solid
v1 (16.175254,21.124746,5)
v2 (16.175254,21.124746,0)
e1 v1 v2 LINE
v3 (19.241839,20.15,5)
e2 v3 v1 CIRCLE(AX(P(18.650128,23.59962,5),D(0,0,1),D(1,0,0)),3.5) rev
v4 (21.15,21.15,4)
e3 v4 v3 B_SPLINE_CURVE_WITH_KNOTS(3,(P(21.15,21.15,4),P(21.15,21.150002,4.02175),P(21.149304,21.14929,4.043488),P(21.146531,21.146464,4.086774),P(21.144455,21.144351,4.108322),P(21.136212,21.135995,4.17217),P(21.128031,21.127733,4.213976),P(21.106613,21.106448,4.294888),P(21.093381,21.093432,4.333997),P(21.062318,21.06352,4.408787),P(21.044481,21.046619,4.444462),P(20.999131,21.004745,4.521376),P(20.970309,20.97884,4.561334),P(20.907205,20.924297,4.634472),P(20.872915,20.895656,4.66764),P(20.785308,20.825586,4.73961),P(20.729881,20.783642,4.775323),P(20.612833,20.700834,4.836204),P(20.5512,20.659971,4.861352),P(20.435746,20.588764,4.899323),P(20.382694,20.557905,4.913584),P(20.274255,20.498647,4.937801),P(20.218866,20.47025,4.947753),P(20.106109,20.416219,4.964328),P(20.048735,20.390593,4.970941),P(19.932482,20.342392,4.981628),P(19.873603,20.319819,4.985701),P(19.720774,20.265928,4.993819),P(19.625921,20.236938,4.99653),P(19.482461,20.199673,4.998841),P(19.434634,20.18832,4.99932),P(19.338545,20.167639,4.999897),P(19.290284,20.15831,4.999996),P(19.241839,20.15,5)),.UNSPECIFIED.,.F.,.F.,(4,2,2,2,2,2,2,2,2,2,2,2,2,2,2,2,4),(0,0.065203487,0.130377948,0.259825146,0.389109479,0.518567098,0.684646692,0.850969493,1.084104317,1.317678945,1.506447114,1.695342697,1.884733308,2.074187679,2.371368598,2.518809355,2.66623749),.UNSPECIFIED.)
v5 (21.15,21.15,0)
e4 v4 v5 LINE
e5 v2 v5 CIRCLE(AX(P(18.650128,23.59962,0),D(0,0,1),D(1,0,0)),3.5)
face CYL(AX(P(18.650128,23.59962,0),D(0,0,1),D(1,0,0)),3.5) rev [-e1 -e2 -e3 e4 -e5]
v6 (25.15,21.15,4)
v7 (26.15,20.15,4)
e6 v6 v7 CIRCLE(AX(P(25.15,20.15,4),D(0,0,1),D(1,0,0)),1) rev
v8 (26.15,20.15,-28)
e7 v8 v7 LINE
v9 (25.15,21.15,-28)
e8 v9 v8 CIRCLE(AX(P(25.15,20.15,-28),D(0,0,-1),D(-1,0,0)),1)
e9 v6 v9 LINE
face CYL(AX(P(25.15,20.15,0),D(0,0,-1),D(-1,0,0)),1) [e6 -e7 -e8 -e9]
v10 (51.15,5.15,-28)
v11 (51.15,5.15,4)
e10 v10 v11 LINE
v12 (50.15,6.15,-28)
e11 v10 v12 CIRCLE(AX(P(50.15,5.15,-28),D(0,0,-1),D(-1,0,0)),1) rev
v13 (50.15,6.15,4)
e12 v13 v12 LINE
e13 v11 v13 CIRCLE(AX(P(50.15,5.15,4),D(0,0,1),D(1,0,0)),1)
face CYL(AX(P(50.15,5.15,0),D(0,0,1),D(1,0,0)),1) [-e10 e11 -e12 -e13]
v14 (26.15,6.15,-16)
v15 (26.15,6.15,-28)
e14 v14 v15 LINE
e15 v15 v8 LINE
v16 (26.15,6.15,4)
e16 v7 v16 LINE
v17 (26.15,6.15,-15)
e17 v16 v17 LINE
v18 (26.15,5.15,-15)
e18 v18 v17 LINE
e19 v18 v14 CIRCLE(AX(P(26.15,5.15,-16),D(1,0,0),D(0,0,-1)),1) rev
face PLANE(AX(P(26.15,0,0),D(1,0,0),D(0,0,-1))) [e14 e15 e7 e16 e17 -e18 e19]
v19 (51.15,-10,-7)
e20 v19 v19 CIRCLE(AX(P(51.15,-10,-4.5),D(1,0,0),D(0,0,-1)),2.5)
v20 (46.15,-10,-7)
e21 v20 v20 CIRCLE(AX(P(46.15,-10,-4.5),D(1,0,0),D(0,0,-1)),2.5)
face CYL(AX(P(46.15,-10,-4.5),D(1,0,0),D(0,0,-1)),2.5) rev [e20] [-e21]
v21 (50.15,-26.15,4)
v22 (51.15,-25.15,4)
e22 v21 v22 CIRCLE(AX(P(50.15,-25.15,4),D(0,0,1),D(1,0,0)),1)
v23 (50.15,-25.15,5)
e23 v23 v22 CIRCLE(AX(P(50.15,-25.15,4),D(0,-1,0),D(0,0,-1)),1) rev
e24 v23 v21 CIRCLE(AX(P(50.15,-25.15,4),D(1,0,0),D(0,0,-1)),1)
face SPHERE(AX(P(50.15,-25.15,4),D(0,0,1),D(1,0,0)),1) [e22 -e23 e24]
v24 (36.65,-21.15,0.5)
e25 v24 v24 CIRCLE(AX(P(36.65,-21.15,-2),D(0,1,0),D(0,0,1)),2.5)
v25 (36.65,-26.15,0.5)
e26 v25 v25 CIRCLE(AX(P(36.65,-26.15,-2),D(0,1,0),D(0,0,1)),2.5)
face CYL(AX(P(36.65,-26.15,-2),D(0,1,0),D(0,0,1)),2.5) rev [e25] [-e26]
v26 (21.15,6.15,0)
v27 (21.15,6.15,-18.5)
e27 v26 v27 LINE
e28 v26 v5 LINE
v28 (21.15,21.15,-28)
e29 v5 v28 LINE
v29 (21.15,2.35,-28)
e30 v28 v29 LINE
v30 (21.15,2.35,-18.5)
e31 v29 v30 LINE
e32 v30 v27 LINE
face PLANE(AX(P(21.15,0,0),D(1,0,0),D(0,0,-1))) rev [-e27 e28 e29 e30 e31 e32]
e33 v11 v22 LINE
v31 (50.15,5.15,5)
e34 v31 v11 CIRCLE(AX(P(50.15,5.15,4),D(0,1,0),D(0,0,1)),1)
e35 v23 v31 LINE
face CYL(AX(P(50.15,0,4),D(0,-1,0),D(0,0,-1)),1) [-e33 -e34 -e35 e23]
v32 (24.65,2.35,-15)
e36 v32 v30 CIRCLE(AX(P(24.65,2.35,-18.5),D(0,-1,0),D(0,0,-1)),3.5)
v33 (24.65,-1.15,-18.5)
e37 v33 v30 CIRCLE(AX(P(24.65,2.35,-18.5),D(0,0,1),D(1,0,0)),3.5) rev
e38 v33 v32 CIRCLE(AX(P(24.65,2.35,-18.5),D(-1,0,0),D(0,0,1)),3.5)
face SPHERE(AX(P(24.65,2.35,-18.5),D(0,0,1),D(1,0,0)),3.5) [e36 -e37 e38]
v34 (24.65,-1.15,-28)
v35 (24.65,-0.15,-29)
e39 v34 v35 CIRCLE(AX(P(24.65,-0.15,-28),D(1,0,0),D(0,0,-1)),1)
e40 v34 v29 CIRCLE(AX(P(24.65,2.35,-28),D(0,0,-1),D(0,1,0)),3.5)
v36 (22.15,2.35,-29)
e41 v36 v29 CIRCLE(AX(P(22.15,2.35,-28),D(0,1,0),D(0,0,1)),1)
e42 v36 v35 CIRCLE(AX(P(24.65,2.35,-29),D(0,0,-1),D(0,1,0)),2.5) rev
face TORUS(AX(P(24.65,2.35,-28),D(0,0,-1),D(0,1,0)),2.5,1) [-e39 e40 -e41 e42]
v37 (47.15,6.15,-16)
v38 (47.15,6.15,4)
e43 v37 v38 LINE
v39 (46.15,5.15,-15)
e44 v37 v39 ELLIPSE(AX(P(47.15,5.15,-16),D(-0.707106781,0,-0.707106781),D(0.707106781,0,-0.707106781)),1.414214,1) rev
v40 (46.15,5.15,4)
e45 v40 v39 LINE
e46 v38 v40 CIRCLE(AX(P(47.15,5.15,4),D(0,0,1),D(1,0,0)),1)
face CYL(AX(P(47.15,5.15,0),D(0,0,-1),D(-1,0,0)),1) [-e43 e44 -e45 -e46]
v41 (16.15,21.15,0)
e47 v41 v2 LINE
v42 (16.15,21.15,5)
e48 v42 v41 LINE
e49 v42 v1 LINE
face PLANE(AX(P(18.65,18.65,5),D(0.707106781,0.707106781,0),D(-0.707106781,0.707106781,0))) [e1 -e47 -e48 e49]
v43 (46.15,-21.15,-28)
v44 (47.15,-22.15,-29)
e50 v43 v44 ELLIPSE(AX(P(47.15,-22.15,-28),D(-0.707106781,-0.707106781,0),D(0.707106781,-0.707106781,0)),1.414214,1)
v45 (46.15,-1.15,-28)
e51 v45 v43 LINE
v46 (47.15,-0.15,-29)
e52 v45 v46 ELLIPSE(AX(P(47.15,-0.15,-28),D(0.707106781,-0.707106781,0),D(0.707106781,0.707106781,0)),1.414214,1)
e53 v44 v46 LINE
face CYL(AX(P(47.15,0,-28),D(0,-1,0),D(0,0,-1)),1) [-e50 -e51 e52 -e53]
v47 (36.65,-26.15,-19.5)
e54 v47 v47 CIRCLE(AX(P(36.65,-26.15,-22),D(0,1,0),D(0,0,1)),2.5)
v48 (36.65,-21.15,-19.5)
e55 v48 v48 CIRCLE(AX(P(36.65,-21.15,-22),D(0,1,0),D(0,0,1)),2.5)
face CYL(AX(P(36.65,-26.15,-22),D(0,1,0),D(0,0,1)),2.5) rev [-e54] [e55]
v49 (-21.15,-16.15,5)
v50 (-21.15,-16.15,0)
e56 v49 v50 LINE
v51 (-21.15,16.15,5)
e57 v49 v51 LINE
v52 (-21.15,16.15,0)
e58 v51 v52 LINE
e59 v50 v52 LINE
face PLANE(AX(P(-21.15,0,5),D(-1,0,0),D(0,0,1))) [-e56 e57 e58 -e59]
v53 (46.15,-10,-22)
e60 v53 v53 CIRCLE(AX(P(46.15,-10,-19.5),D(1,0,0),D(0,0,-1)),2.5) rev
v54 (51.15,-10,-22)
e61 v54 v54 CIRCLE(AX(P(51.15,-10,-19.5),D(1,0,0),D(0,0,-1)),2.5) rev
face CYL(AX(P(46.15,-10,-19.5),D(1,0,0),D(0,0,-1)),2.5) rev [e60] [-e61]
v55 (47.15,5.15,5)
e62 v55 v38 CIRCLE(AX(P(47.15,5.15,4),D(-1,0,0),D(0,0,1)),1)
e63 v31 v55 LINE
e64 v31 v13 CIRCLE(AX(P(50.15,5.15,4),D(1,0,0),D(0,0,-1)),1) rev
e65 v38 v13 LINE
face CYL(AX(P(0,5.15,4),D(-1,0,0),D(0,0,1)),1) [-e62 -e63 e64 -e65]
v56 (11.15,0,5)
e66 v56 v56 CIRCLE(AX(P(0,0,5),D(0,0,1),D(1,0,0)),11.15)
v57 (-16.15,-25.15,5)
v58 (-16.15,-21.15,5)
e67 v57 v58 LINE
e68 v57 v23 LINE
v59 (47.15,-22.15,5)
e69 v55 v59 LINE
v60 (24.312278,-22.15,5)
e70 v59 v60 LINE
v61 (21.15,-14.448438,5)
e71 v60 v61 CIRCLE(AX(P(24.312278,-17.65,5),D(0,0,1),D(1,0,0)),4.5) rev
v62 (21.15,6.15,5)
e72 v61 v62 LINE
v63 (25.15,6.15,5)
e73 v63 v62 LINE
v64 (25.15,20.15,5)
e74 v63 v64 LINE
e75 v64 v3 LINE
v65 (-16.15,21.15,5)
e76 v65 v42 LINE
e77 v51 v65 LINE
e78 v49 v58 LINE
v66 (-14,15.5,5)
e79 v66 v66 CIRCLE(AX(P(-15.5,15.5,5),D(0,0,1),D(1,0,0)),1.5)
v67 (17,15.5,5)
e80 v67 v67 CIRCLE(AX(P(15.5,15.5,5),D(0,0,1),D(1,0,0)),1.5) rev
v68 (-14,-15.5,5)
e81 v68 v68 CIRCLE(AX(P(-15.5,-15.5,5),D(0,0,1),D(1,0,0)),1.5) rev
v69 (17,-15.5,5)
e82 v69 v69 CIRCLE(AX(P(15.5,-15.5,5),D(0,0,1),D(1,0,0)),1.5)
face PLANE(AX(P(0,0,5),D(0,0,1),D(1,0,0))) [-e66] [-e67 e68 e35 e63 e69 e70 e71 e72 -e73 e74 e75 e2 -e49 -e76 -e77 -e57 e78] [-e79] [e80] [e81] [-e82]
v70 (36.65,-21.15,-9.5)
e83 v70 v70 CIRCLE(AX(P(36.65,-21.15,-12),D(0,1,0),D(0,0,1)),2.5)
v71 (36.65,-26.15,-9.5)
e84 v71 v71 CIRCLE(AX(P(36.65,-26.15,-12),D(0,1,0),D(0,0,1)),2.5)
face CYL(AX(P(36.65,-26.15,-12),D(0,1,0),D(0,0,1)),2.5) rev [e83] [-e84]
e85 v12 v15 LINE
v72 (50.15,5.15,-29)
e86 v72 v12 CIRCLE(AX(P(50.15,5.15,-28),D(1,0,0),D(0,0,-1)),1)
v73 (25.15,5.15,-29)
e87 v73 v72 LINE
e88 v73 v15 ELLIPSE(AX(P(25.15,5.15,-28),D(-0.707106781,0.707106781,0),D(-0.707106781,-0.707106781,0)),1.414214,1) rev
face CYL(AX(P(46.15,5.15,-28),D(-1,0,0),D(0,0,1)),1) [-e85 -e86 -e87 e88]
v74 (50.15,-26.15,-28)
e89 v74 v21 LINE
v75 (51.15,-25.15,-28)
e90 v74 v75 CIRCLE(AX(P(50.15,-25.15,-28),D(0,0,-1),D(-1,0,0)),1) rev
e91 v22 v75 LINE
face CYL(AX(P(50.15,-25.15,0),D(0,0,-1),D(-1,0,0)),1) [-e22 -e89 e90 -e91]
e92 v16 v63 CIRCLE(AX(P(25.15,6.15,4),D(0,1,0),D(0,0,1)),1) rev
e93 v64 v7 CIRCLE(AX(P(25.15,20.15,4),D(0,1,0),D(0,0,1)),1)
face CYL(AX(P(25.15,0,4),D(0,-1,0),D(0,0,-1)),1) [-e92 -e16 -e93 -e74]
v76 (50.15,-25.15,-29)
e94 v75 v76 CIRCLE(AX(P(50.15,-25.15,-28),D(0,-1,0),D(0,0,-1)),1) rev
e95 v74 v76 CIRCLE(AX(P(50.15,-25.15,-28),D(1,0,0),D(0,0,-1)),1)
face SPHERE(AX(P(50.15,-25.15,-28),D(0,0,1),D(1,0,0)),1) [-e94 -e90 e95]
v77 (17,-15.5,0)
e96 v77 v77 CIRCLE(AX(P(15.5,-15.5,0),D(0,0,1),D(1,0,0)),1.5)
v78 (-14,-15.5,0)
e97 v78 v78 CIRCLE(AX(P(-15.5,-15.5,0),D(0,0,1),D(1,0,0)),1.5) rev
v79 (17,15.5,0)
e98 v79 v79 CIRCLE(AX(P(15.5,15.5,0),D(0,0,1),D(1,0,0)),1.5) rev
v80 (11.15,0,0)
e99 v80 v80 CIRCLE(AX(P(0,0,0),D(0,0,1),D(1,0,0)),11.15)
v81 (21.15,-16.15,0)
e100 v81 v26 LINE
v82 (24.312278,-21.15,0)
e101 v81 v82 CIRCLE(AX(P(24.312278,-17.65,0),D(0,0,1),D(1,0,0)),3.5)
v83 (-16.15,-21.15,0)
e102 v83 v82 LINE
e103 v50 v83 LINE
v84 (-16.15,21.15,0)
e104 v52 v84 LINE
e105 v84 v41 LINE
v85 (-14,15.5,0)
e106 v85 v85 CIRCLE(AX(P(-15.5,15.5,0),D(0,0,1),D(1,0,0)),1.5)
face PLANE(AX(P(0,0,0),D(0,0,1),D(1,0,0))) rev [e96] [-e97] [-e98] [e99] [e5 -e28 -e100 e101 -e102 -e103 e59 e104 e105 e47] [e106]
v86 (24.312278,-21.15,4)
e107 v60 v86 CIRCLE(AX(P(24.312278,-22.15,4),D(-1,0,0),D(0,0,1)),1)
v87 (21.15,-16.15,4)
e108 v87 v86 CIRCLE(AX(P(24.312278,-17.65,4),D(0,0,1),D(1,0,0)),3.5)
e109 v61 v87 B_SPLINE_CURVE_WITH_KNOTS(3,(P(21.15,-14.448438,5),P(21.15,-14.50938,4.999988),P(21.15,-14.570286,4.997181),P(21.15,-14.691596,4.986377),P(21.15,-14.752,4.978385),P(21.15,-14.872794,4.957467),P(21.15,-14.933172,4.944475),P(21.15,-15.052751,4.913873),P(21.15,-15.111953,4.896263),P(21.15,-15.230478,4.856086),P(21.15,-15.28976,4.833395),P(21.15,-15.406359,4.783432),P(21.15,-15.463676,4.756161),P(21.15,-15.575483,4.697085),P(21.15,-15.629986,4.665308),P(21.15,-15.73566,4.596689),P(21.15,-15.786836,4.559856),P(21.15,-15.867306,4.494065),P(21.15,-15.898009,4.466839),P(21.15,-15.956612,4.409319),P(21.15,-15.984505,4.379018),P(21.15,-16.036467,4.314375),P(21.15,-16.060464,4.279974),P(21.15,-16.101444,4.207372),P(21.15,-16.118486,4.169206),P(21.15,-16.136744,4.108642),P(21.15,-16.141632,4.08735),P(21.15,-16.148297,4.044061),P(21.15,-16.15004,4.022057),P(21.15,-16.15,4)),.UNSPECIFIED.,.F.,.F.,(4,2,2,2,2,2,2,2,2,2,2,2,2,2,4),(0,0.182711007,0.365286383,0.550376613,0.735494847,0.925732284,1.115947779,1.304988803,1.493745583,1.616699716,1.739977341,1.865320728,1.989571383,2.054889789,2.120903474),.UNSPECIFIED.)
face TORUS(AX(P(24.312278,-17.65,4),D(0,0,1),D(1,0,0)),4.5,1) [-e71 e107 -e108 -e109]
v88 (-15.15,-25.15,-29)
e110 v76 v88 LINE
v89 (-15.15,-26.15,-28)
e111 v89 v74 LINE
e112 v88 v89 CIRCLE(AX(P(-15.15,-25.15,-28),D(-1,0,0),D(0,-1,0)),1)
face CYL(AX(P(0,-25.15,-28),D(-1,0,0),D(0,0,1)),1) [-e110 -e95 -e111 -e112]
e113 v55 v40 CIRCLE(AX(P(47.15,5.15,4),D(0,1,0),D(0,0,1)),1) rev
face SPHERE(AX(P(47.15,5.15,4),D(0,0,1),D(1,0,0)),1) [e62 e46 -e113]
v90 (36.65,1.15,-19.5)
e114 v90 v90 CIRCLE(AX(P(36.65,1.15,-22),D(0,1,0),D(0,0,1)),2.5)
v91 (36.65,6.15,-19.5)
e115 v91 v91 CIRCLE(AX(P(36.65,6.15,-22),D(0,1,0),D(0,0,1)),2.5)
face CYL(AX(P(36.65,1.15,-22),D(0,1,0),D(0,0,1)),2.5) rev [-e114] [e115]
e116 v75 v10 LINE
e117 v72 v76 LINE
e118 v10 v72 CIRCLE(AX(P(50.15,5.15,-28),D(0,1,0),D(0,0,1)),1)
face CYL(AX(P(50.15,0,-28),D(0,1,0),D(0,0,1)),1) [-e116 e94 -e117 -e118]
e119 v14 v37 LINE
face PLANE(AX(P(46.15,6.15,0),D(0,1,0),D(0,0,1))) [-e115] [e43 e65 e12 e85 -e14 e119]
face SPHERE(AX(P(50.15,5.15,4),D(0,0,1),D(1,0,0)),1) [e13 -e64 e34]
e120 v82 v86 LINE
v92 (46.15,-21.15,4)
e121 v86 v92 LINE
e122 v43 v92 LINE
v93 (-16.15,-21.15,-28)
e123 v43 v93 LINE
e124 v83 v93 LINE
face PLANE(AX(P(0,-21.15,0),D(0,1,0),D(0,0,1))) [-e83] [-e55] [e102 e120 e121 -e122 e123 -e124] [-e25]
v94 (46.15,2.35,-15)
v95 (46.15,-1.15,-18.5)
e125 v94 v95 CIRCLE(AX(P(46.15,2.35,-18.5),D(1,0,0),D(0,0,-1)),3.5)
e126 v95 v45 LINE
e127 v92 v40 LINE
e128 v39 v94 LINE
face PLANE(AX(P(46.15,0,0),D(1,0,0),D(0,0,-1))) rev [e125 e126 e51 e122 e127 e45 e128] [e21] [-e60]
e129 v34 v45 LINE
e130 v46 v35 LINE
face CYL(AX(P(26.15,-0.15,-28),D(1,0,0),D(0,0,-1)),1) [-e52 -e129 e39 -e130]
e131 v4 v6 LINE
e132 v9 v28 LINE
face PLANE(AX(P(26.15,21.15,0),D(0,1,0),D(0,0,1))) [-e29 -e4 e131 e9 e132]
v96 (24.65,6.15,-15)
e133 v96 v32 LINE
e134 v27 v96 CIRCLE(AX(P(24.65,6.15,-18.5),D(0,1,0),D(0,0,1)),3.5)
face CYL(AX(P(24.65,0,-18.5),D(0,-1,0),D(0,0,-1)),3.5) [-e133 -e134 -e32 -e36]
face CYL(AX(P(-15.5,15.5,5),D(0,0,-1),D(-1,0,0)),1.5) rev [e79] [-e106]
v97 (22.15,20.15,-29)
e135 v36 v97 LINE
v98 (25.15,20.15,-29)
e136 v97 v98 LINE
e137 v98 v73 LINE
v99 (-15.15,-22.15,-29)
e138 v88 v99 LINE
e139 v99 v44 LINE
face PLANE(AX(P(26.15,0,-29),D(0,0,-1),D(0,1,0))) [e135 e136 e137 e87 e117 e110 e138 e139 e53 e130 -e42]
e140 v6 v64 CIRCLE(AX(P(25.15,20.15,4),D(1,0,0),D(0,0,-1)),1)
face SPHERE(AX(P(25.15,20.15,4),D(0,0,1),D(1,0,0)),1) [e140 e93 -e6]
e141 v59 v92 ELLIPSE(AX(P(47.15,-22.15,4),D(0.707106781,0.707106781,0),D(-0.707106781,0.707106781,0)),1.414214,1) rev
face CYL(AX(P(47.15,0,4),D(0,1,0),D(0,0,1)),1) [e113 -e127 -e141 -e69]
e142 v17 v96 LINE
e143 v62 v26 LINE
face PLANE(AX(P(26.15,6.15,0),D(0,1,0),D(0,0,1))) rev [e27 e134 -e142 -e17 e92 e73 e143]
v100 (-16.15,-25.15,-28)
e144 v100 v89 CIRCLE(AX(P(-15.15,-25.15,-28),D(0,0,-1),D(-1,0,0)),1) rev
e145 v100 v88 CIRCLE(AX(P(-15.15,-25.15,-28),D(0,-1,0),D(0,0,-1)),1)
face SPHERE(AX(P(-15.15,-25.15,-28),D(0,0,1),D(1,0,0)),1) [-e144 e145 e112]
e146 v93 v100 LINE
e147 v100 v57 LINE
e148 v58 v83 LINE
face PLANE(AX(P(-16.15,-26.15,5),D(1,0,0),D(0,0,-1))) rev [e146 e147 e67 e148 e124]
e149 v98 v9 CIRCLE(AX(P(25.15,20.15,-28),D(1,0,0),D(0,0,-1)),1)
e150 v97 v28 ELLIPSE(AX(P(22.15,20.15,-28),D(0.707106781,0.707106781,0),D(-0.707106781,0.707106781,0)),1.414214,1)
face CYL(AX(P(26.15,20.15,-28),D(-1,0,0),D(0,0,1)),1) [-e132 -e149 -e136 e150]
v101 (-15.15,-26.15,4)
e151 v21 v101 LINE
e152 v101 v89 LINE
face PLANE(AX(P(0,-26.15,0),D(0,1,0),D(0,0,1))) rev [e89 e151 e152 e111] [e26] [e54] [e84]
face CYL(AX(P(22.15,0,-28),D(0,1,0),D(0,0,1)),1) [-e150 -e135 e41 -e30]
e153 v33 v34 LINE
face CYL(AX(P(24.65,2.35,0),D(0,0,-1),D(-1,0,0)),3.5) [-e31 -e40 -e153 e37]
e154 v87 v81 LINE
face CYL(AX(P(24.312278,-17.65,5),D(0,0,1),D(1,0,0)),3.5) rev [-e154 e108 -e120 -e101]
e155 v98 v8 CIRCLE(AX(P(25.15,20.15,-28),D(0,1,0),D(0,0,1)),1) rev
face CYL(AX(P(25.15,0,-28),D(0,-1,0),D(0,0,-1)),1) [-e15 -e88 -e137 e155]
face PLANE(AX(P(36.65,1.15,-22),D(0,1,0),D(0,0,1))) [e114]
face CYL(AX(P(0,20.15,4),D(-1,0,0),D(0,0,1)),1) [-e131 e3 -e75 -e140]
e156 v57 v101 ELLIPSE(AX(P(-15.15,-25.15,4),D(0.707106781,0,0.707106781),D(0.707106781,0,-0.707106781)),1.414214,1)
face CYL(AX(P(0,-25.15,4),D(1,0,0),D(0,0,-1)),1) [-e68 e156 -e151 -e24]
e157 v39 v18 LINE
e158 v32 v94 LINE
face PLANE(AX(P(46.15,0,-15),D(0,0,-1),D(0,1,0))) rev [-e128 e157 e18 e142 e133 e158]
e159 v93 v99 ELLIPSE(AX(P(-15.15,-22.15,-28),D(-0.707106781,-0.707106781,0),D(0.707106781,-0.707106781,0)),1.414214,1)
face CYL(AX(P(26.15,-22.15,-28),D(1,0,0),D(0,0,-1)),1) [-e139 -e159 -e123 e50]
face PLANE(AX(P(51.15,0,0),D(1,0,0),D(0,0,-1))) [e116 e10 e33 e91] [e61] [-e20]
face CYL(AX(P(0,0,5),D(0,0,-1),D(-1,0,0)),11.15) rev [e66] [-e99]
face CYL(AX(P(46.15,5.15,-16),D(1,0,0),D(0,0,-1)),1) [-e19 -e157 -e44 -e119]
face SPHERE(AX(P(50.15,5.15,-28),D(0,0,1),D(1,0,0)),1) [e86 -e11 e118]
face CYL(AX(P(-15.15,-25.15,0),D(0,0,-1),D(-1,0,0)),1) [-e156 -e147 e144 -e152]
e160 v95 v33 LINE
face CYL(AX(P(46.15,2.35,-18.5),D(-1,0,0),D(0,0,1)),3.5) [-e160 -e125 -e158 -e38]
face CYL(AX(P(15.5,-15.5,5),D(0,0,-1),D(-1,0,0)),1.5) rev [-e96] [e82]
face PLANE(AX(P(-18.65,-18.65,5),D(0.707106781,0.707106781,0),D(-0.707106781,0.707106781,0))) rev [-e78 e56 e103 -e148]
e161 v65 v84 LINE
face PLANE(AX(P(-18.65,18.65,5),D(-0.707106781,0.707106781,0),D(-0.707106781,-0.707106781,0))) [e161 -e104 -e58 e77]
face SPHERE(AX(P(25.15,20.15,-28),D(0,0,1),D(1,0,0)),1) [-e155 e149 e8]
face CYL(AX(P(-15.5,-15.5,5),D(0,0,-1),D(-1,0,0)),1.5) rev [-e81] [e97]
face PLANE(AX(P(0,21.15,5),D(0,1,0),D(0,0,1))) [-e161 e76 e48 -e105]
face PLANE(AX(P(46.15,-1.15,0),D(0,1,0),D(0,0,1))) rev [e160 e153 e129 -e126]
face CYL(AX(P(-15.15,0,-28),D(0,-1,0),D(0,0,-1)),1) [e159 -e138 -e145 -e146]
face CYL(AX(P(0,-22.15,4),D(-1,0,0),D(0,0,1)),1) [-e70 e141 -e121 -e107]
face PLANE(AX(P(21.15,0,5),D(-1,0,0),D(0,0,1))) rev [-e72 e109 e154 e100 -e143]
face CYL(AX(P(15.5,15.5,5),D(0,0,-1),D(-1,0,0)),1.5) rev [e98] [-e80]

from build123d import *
from OCP.BRepAlgoAPI import BRepAlgoAPI_Cut
from OCP.TopTools import TopTools_ListOfShape

# Parameters (mm, degrees)
SKETCH_1_R          = 11.15
SKETCH_1_R_2        = 1.5
EXTRUDE_1_DEPTH     = 5
SKETCH_2_W          = 14
SKETCH_2_H          = 10
SKETCH_2_W_2        = 15
SKETCH_2_W_3        = 5
SKETCH_2_H_2        = 5
EXTRUDE_2_DEPTH     = 5
SKETCH_2_3_W        = 14
SKETCH_2_3_H        = 7.3
EXTRUDE_6_DEPTH     = 25
SKETCH_6_W          = 14
SKETCH_6_H          = 7.3
EXTRUDE_7_DEPTH     = 5
SKETCH_7_W          = 67.3
SKETCH_7_H          = 34
EXTRUDE_8_DEPTH     = 5
FILLET_9_R          = 3.5
FILLET_8_R          = 1
FILLET_10_DEPTH     = 4.450151431
FILLET_START        = 4.450151431
FILLET_10_2_DEPTH   = 0.549848569
FILLET_START_2      = 19.24183889
FILLET_10_3_DEPTH   = 1.90816111
FILLET_11_R         = 3.5
SKETCH_8_R          = 2.5
CUT_EXTRUDE_1_DEPTH = 5
SKETCH_9_R          = 2.5
CUT_EXTRUDE_2_DEPTH = 5
SKETCH_10_R         = 2.5
CUT_EXTRUDE_3_DEPTH = 5


with BuildPart() as part:
    # 스케치1 → 보스-돌출1 (new body)
    with BuildSketch(Plane.XY):
        Polygon((-21.15, -16.15), (-21.15, 16.15), (-16.15, 21.15), (16.15, 21.15), (21.15, 16.15), (21.15, -16.15), (16.15, -21.15), (-16.15, -21.15), align=None)
        Circle(SKETCH_1_R, mode=Mode.SUBTRACT)
        with Locations((15.5, 15.5)):
            Circle(SKETCH_1_R_2, mode=Mode.SUBTRACT)
        with Locations((-15.5, 15.5)):
            Circle(SKETCH_1_R_2, mode=Mode.SUBTRACT)
        with Locations((15.5, -15.5)):
            Circle(SKETCH_1_R_2, mode=Mode.SUBTRACT)
        with Locations((-15.5, -15.5)):
            Circle(SKETCH_1_R_2, mode=Mode.SUBTRACT)
    extrude(amount=EXTRUDE_1_DEPTH)

    # 스케치2 → 보스-돌출2 (add)
    with BuildSketch(Plane(origin=(21.15, 0, 0), x_dir=(0, 0, -1), z_dir=(1, 0, 0))):
        with Locations((22, 11.15)):
            Rectangle(SKETCH_2_W, SKETCH_2_H)
        with Locations((7.5, 11.15)):
            Rectangle(SKETCH_2_W_2, SKETCH_2_H)
        with Locations((-2.5, 11.15)):
            Rectangle(SKETCH_2_W_3, SKETCH_2_H)
        with Locations((-2.5, 18.65)):
            Rectangle(SKETCH_2_W_3, SKETCH_2_H_2)
        with Locations((7.5, 18.65)):
            Rectangle(SKETCH_2_W_2, SKETCH_2_H_2)
        with Locations((22, 18.65)):
            Rectangle(SKETCH_2_W, SKETCH_2_H_2)
    extrude(amount=EXTRUDE_2_DEPTH)

    # 스케치2<3> → 보스-돌출6 (add)
    with BuildSketch(Plane(origin=(21.15, 0, 0), x_dir=(0, 0, -1), z_dir=(1, 0, 0))):
        with Locations((22, 2.5)):
            Rectangle(SKETCH_2_3_W, SKETCH_2_3_H)
    extrude(amount=EXTRUDE_6_DEPTH)

    # 스케치6 → 보스-돌출7 (add)
    with BuildSketch(Plane(origin=(46.15, 0, 0), x_dir=(0, 0, -1), z_dir=(1, 0, 0))):
        with Locations((22, 2.5)):
            Rectangle(SKETCH_6_W, SKETCH_6_H)
        Polygon((15, -1.15), (15, 6.15), (-5, 6.15), (-5, -21.15), (29, -21.15), (29, -1.15), align=None)
    extrude(amount=EXTRUDE_7_DEPTH)

    # 스케치7 → 보스-돌출8 (add)
    with BuildSketch(Plane.XZ.offset(21.15)):
        with Locations((17.5, -12)):
            Rectangle(SKETCH_7_W, SKETCH_7_H)
    extrude(amount=EXTRUDE_8_DEPTH)

    # 필렛9
    # the kernel refuses this fillet: 3.5 mm, written as the material it adds along each edge
    with BuildSketch(Plane(origin=(16.15, -21.15, 0), x_dir=(1, 0, 0), z_dir=(0, 0, 1))) as fillet_9_piece_1:
        with BuildLine():
            CenterArc((8.16227766, 3.5), FILLET_9_R, 154.623066475, 115.376933525)
            Line((5, 5), (0, 0))
            Line((0, 0), (8.16227766, 0))
        make_face()
    extrude(amount=5)

    # 필렛8
    fillet_8_edges = [part.edges().sort_by_distance(p)[0] for p in [
        (17.5, -26.15, -29),
        (21.354237769, -19.520828693, 5),
        (21.15, 10, -29),
        (26.15, 21.15, -12),
        (23.65, 21.15, -29),
        (23.65, 21.15, 5),
        (26.15, 13.65, -29),
        (26.15, 13.65, 5),
        (36.15, 6.15, -15),
        (33.65, -1.15, -29),
        (38.65, 6.15, -29),
        (46.15, 6.15, -5),
        (46.15, -7.5, 5),
        (48.65, 6.15, 5),
        (46.15, -11.15, -29),
        (51.15, 6.15, -12),
        (51.15, -10, 5),
        (51.15, -10, -29),
        (35.23113883, -21.15, 5),
        (15, -21.15, -29),
        (-16.15, -23.65, -29),
        (51.15, -26.15, -12),
        (17.5, -26.15, 5),
        (-16.15, -26.15, -12),
    ]]
    fillet(fillet_8_edges, radius=FILLET_8_R)


with BuildPart() as fillet_10_tool:
    # 필렛10: read off the stored shape, not the designer's step
    # 필렛10 outline → 필렛10 (new body)
    with BuildSketch(Plane.XY):
        with BuildLine():
            ThreePointArc((21.150000872, 21.15000089), (18.667895356, 20.099665017), (16.175253817, 21.124746183))
            Line((16.175253817, 21.124746183), (21.15, 16.15))
            Line((21.15, 16.15), (21.150000872, 21.15000089))
        make_face()
    extrude(amount=FILLET_10_DEPTH)


with BuildPart() as part_1:
    add(part.part)


with BuildPart() as part_2:
    # 필렛10: joined with fillet_10_tool
    add(part_1.part.fuse(fillet_10_tool.part, tol=0.00001))


with BuildPart() as fillet_10_2_tool:
    # Fillet 10 2 outline → Fillet 10 2 (new body)
    with BuildSketch(Plane.XY.offset(FILLET_START)):
        with BuildLine():
            ThreePointArc((21.150000872, 21.15000089), (18.667895356, 20.099665017), (16.175253817, 21.124746183))
            Line((16.175253817, 21.124746183), (21.15, 16.15))
            Line((21.15, 16.15), (21.15, 21.042952232))
            Line((21.15, 21.042952232), (21.150000872, 21.15000089))
        make_face()
    extrude(amount=FILLET_10_2_DEPTH)


with BuildPart() as part_3:
    add(part_2.part)


with BuildPart() as part_4:
    # Fillet 10 2: joined with fillet_10_2_tool
    add(part_3.part.fuse(fillet_10_2_tool.part, tol=0.00001))


with BuildPart() as fillet_10_3_tool:
    # Fillet 10 3 outline → Fillet 10 3 (new body)
    with BuildSketch(Plane.YZ.offset(FILLET_START_2)):
        with BuildLine():
            Line((19, 5.000000001), (20.15, 5))
            ThreePointArc((20.15, 5), (20.857106781, 4.707106781), (21.15, 4))
            Line((21.15, 4), (21.150000003, -1))
            Line((21.150000003, -1), (23, -1))
            Line((23, -1), (23, 6))
            Line((23, 6), (19, 6))
            Line((19, 6), (19, 5.000000001))
        make_face()
    extrude(amount=FILLET_10_3_DEPTH)


with BuildPart() as part_5:
    add(part_4.part)

    # Fillet 10 3: cut by fillet_10_3_tool, with a tolerance
    fillet_10_3_stock = TopTools_ListOfShape()
    fillet_10_3_stock.Append(part_5.part.wrapped)
    fillet_10_3_tools = TopTools_ListOfShape()
    fillet_10_3_tools.Append(fillet_10_3_tool.part.wrapped)
    fillet_10_3_cut = BRepAlgoAPI_Cut()
    fillet_10_3_cut.SetArguments(fillet_10_3_stock)
    fillet_10_3_cut.SetTools(fillet_10_3_tools)
    fillet_10_3_cut.SetFuzzyValue(0.00001)
    fillet_10_3_cut.Build()
    add(Compound.cast(fillet_10_3_cut.Shape()).solids(), mode=Mode.REPLACE)

    # 필렛11
    # the kernel refuses this fillet: 3.5 mm, written as the material it takes off along each edge
    with BuildSketch(Plane(origin=(24.65, 2.35, -29), x_dir=(0, -1, 0), z_dir=(1, 0, 0))) as fillet_11_piece_1:
        with BuildLine():
            CenterArc((2.5, -1), 1, 0, 90)
            Line((3.5, -1), (3.5, 0))
            Line((3.5, 0), (2.5, 0))
        make_face()
    revolve(axis=Axis((24.65, 2.35, -29), (0, 0, -1)), revolution_arc=90, mode=Mode.SUBTRACT)
    with BuildSketch(Plane(origin=(24.65, 2.35, -18.5), x_dir=(-1, 0, 0), z_dir=(0, 0, 1))) as fillet_11_piece_2_section:
        Polygon((0, 0), (FILLET_11_R, 0), (FILLET_11_R, FILLET_11_R), (0, FILLET_11_R), align=None)
    fillet_11_piece_2 = extrude(amount=FILLET_11_R, mode=Mode.PRIVATE)
    fillet_11_piece_2 = fillet_11_piece_2 - Plane(origin=(24.65, 2.35, -18.5), x_dir=(0.7071067811865475, 0.7071067811865475, 0), z_dir=(0, 0, 1)) * Sphere(FILLET_11_R, mode=Mode.PRIVATE)
    add(fillet_11_piece_2, mode=Mode.SUBTRACT)
    with BuildSketch(Plane(origin=(21.15, 6.15, -15), x_dir=(1, 0, 0), z_dir=(0, -1, 0))) as fillet_11_piece_3:
        with BuildLine():
            CenterArc((FILLET_11_R, -FILLET_11_R), FILLET_11_R, 90, 90)
            Line((0, -FILLET_11_R), (0, 0))
            Line((0, 0), (FILLET_11_R, 0))
        make_face()
    extrude(amount=3.8, mode=Mode.SUBTRACT)
    with BuildSketch(Plane(origin=(21.15, -1.15, -18.5), x_dir=(0, 1, 0), z_dir=(0, 0, -1))) as fillet_11_piece_4:
        with BuildLine():
            CenterArc((FILLET_11_R, FILLET_11_R), FILLET_11_R, 180, 90)
            Line((0, FILLET_11_R), (0, 0))
            Line((0, 0), (FILLET_11_R, 0))
        make_face()
    extrude(amount=10.5, mode=Mode.SUBTRACT)
    with BuildSketch(Plane(origin=(24.65, -1.15, -15), x_dir=(0, 1, 0), z_dir=(1, 0, 0))) as fillet_11_piece_5:
        with BuildLine():
            CenterArc((FILLET_11_R, -FILLET_11_R), FILLET_11_R, 90, 90)
            Line((0, -FILLET_11_R), (0, 0))
            Line((0, 0), (FILLET_11_R, 0))
        make_face()
    extrude(amount=21.5, mode=Mode.SUBTRACT)

    # 스케치8 → 컷-돌출1 (cut)
    with BuildSketch(Plane(origin=(0, 6.15, 0), x_dir=(1, 0, 0), z_dir=(0, 1, 0))):
        with Locations(Location((36.65, 22, 0), (0, 0, 270))):
            Circle(SKETCH_8_R)
    extrude(amount=-CUT_EXTRUDE_1_DEPTH, mode=Mode.SUBTRACT)

    # 스케치9 → 컷-돌출2 (cut)
    with BuildSketch(Plane(origin=(51.15, 0, 0), x_dir=(0, 0, -1), z_dir=(1, 0, 0))):
        with Locations((4.5, -10)):
            Circle(SKETCH_9_R)
        with Locations((19.5, -10)):
            Circle(SKETCH_9_R)
    extrude(amount=-CUT_EXTRUDE_2_DEPTH, mode=Mode.SUBTRACT)

    # 스케치10 → 컷-돌출3 (cut)
    with BuildSketch(Plane(origin=(0, -21.15, 0), x_dir=(1, 0, 0), z_dir=(0, 1, 0))):
        with Locations(Location((36.65, 22, 0), (0, 0, 270))):
            Circle(SKETCH_10_R)
        with Locations(Location((36.65, 12, 0), (0, 0, 270))):
            Circle(SKETCH_10_R)
        with Locations(Location((36.65, 2, 0), (0, 0, 270))):
            Circle(SKETCH_10_R)
    extrude(amount=-CUT_EXTRUDE_3_DEPTH, mode=Mode.SUBTRACT)


solid = part_5.part
